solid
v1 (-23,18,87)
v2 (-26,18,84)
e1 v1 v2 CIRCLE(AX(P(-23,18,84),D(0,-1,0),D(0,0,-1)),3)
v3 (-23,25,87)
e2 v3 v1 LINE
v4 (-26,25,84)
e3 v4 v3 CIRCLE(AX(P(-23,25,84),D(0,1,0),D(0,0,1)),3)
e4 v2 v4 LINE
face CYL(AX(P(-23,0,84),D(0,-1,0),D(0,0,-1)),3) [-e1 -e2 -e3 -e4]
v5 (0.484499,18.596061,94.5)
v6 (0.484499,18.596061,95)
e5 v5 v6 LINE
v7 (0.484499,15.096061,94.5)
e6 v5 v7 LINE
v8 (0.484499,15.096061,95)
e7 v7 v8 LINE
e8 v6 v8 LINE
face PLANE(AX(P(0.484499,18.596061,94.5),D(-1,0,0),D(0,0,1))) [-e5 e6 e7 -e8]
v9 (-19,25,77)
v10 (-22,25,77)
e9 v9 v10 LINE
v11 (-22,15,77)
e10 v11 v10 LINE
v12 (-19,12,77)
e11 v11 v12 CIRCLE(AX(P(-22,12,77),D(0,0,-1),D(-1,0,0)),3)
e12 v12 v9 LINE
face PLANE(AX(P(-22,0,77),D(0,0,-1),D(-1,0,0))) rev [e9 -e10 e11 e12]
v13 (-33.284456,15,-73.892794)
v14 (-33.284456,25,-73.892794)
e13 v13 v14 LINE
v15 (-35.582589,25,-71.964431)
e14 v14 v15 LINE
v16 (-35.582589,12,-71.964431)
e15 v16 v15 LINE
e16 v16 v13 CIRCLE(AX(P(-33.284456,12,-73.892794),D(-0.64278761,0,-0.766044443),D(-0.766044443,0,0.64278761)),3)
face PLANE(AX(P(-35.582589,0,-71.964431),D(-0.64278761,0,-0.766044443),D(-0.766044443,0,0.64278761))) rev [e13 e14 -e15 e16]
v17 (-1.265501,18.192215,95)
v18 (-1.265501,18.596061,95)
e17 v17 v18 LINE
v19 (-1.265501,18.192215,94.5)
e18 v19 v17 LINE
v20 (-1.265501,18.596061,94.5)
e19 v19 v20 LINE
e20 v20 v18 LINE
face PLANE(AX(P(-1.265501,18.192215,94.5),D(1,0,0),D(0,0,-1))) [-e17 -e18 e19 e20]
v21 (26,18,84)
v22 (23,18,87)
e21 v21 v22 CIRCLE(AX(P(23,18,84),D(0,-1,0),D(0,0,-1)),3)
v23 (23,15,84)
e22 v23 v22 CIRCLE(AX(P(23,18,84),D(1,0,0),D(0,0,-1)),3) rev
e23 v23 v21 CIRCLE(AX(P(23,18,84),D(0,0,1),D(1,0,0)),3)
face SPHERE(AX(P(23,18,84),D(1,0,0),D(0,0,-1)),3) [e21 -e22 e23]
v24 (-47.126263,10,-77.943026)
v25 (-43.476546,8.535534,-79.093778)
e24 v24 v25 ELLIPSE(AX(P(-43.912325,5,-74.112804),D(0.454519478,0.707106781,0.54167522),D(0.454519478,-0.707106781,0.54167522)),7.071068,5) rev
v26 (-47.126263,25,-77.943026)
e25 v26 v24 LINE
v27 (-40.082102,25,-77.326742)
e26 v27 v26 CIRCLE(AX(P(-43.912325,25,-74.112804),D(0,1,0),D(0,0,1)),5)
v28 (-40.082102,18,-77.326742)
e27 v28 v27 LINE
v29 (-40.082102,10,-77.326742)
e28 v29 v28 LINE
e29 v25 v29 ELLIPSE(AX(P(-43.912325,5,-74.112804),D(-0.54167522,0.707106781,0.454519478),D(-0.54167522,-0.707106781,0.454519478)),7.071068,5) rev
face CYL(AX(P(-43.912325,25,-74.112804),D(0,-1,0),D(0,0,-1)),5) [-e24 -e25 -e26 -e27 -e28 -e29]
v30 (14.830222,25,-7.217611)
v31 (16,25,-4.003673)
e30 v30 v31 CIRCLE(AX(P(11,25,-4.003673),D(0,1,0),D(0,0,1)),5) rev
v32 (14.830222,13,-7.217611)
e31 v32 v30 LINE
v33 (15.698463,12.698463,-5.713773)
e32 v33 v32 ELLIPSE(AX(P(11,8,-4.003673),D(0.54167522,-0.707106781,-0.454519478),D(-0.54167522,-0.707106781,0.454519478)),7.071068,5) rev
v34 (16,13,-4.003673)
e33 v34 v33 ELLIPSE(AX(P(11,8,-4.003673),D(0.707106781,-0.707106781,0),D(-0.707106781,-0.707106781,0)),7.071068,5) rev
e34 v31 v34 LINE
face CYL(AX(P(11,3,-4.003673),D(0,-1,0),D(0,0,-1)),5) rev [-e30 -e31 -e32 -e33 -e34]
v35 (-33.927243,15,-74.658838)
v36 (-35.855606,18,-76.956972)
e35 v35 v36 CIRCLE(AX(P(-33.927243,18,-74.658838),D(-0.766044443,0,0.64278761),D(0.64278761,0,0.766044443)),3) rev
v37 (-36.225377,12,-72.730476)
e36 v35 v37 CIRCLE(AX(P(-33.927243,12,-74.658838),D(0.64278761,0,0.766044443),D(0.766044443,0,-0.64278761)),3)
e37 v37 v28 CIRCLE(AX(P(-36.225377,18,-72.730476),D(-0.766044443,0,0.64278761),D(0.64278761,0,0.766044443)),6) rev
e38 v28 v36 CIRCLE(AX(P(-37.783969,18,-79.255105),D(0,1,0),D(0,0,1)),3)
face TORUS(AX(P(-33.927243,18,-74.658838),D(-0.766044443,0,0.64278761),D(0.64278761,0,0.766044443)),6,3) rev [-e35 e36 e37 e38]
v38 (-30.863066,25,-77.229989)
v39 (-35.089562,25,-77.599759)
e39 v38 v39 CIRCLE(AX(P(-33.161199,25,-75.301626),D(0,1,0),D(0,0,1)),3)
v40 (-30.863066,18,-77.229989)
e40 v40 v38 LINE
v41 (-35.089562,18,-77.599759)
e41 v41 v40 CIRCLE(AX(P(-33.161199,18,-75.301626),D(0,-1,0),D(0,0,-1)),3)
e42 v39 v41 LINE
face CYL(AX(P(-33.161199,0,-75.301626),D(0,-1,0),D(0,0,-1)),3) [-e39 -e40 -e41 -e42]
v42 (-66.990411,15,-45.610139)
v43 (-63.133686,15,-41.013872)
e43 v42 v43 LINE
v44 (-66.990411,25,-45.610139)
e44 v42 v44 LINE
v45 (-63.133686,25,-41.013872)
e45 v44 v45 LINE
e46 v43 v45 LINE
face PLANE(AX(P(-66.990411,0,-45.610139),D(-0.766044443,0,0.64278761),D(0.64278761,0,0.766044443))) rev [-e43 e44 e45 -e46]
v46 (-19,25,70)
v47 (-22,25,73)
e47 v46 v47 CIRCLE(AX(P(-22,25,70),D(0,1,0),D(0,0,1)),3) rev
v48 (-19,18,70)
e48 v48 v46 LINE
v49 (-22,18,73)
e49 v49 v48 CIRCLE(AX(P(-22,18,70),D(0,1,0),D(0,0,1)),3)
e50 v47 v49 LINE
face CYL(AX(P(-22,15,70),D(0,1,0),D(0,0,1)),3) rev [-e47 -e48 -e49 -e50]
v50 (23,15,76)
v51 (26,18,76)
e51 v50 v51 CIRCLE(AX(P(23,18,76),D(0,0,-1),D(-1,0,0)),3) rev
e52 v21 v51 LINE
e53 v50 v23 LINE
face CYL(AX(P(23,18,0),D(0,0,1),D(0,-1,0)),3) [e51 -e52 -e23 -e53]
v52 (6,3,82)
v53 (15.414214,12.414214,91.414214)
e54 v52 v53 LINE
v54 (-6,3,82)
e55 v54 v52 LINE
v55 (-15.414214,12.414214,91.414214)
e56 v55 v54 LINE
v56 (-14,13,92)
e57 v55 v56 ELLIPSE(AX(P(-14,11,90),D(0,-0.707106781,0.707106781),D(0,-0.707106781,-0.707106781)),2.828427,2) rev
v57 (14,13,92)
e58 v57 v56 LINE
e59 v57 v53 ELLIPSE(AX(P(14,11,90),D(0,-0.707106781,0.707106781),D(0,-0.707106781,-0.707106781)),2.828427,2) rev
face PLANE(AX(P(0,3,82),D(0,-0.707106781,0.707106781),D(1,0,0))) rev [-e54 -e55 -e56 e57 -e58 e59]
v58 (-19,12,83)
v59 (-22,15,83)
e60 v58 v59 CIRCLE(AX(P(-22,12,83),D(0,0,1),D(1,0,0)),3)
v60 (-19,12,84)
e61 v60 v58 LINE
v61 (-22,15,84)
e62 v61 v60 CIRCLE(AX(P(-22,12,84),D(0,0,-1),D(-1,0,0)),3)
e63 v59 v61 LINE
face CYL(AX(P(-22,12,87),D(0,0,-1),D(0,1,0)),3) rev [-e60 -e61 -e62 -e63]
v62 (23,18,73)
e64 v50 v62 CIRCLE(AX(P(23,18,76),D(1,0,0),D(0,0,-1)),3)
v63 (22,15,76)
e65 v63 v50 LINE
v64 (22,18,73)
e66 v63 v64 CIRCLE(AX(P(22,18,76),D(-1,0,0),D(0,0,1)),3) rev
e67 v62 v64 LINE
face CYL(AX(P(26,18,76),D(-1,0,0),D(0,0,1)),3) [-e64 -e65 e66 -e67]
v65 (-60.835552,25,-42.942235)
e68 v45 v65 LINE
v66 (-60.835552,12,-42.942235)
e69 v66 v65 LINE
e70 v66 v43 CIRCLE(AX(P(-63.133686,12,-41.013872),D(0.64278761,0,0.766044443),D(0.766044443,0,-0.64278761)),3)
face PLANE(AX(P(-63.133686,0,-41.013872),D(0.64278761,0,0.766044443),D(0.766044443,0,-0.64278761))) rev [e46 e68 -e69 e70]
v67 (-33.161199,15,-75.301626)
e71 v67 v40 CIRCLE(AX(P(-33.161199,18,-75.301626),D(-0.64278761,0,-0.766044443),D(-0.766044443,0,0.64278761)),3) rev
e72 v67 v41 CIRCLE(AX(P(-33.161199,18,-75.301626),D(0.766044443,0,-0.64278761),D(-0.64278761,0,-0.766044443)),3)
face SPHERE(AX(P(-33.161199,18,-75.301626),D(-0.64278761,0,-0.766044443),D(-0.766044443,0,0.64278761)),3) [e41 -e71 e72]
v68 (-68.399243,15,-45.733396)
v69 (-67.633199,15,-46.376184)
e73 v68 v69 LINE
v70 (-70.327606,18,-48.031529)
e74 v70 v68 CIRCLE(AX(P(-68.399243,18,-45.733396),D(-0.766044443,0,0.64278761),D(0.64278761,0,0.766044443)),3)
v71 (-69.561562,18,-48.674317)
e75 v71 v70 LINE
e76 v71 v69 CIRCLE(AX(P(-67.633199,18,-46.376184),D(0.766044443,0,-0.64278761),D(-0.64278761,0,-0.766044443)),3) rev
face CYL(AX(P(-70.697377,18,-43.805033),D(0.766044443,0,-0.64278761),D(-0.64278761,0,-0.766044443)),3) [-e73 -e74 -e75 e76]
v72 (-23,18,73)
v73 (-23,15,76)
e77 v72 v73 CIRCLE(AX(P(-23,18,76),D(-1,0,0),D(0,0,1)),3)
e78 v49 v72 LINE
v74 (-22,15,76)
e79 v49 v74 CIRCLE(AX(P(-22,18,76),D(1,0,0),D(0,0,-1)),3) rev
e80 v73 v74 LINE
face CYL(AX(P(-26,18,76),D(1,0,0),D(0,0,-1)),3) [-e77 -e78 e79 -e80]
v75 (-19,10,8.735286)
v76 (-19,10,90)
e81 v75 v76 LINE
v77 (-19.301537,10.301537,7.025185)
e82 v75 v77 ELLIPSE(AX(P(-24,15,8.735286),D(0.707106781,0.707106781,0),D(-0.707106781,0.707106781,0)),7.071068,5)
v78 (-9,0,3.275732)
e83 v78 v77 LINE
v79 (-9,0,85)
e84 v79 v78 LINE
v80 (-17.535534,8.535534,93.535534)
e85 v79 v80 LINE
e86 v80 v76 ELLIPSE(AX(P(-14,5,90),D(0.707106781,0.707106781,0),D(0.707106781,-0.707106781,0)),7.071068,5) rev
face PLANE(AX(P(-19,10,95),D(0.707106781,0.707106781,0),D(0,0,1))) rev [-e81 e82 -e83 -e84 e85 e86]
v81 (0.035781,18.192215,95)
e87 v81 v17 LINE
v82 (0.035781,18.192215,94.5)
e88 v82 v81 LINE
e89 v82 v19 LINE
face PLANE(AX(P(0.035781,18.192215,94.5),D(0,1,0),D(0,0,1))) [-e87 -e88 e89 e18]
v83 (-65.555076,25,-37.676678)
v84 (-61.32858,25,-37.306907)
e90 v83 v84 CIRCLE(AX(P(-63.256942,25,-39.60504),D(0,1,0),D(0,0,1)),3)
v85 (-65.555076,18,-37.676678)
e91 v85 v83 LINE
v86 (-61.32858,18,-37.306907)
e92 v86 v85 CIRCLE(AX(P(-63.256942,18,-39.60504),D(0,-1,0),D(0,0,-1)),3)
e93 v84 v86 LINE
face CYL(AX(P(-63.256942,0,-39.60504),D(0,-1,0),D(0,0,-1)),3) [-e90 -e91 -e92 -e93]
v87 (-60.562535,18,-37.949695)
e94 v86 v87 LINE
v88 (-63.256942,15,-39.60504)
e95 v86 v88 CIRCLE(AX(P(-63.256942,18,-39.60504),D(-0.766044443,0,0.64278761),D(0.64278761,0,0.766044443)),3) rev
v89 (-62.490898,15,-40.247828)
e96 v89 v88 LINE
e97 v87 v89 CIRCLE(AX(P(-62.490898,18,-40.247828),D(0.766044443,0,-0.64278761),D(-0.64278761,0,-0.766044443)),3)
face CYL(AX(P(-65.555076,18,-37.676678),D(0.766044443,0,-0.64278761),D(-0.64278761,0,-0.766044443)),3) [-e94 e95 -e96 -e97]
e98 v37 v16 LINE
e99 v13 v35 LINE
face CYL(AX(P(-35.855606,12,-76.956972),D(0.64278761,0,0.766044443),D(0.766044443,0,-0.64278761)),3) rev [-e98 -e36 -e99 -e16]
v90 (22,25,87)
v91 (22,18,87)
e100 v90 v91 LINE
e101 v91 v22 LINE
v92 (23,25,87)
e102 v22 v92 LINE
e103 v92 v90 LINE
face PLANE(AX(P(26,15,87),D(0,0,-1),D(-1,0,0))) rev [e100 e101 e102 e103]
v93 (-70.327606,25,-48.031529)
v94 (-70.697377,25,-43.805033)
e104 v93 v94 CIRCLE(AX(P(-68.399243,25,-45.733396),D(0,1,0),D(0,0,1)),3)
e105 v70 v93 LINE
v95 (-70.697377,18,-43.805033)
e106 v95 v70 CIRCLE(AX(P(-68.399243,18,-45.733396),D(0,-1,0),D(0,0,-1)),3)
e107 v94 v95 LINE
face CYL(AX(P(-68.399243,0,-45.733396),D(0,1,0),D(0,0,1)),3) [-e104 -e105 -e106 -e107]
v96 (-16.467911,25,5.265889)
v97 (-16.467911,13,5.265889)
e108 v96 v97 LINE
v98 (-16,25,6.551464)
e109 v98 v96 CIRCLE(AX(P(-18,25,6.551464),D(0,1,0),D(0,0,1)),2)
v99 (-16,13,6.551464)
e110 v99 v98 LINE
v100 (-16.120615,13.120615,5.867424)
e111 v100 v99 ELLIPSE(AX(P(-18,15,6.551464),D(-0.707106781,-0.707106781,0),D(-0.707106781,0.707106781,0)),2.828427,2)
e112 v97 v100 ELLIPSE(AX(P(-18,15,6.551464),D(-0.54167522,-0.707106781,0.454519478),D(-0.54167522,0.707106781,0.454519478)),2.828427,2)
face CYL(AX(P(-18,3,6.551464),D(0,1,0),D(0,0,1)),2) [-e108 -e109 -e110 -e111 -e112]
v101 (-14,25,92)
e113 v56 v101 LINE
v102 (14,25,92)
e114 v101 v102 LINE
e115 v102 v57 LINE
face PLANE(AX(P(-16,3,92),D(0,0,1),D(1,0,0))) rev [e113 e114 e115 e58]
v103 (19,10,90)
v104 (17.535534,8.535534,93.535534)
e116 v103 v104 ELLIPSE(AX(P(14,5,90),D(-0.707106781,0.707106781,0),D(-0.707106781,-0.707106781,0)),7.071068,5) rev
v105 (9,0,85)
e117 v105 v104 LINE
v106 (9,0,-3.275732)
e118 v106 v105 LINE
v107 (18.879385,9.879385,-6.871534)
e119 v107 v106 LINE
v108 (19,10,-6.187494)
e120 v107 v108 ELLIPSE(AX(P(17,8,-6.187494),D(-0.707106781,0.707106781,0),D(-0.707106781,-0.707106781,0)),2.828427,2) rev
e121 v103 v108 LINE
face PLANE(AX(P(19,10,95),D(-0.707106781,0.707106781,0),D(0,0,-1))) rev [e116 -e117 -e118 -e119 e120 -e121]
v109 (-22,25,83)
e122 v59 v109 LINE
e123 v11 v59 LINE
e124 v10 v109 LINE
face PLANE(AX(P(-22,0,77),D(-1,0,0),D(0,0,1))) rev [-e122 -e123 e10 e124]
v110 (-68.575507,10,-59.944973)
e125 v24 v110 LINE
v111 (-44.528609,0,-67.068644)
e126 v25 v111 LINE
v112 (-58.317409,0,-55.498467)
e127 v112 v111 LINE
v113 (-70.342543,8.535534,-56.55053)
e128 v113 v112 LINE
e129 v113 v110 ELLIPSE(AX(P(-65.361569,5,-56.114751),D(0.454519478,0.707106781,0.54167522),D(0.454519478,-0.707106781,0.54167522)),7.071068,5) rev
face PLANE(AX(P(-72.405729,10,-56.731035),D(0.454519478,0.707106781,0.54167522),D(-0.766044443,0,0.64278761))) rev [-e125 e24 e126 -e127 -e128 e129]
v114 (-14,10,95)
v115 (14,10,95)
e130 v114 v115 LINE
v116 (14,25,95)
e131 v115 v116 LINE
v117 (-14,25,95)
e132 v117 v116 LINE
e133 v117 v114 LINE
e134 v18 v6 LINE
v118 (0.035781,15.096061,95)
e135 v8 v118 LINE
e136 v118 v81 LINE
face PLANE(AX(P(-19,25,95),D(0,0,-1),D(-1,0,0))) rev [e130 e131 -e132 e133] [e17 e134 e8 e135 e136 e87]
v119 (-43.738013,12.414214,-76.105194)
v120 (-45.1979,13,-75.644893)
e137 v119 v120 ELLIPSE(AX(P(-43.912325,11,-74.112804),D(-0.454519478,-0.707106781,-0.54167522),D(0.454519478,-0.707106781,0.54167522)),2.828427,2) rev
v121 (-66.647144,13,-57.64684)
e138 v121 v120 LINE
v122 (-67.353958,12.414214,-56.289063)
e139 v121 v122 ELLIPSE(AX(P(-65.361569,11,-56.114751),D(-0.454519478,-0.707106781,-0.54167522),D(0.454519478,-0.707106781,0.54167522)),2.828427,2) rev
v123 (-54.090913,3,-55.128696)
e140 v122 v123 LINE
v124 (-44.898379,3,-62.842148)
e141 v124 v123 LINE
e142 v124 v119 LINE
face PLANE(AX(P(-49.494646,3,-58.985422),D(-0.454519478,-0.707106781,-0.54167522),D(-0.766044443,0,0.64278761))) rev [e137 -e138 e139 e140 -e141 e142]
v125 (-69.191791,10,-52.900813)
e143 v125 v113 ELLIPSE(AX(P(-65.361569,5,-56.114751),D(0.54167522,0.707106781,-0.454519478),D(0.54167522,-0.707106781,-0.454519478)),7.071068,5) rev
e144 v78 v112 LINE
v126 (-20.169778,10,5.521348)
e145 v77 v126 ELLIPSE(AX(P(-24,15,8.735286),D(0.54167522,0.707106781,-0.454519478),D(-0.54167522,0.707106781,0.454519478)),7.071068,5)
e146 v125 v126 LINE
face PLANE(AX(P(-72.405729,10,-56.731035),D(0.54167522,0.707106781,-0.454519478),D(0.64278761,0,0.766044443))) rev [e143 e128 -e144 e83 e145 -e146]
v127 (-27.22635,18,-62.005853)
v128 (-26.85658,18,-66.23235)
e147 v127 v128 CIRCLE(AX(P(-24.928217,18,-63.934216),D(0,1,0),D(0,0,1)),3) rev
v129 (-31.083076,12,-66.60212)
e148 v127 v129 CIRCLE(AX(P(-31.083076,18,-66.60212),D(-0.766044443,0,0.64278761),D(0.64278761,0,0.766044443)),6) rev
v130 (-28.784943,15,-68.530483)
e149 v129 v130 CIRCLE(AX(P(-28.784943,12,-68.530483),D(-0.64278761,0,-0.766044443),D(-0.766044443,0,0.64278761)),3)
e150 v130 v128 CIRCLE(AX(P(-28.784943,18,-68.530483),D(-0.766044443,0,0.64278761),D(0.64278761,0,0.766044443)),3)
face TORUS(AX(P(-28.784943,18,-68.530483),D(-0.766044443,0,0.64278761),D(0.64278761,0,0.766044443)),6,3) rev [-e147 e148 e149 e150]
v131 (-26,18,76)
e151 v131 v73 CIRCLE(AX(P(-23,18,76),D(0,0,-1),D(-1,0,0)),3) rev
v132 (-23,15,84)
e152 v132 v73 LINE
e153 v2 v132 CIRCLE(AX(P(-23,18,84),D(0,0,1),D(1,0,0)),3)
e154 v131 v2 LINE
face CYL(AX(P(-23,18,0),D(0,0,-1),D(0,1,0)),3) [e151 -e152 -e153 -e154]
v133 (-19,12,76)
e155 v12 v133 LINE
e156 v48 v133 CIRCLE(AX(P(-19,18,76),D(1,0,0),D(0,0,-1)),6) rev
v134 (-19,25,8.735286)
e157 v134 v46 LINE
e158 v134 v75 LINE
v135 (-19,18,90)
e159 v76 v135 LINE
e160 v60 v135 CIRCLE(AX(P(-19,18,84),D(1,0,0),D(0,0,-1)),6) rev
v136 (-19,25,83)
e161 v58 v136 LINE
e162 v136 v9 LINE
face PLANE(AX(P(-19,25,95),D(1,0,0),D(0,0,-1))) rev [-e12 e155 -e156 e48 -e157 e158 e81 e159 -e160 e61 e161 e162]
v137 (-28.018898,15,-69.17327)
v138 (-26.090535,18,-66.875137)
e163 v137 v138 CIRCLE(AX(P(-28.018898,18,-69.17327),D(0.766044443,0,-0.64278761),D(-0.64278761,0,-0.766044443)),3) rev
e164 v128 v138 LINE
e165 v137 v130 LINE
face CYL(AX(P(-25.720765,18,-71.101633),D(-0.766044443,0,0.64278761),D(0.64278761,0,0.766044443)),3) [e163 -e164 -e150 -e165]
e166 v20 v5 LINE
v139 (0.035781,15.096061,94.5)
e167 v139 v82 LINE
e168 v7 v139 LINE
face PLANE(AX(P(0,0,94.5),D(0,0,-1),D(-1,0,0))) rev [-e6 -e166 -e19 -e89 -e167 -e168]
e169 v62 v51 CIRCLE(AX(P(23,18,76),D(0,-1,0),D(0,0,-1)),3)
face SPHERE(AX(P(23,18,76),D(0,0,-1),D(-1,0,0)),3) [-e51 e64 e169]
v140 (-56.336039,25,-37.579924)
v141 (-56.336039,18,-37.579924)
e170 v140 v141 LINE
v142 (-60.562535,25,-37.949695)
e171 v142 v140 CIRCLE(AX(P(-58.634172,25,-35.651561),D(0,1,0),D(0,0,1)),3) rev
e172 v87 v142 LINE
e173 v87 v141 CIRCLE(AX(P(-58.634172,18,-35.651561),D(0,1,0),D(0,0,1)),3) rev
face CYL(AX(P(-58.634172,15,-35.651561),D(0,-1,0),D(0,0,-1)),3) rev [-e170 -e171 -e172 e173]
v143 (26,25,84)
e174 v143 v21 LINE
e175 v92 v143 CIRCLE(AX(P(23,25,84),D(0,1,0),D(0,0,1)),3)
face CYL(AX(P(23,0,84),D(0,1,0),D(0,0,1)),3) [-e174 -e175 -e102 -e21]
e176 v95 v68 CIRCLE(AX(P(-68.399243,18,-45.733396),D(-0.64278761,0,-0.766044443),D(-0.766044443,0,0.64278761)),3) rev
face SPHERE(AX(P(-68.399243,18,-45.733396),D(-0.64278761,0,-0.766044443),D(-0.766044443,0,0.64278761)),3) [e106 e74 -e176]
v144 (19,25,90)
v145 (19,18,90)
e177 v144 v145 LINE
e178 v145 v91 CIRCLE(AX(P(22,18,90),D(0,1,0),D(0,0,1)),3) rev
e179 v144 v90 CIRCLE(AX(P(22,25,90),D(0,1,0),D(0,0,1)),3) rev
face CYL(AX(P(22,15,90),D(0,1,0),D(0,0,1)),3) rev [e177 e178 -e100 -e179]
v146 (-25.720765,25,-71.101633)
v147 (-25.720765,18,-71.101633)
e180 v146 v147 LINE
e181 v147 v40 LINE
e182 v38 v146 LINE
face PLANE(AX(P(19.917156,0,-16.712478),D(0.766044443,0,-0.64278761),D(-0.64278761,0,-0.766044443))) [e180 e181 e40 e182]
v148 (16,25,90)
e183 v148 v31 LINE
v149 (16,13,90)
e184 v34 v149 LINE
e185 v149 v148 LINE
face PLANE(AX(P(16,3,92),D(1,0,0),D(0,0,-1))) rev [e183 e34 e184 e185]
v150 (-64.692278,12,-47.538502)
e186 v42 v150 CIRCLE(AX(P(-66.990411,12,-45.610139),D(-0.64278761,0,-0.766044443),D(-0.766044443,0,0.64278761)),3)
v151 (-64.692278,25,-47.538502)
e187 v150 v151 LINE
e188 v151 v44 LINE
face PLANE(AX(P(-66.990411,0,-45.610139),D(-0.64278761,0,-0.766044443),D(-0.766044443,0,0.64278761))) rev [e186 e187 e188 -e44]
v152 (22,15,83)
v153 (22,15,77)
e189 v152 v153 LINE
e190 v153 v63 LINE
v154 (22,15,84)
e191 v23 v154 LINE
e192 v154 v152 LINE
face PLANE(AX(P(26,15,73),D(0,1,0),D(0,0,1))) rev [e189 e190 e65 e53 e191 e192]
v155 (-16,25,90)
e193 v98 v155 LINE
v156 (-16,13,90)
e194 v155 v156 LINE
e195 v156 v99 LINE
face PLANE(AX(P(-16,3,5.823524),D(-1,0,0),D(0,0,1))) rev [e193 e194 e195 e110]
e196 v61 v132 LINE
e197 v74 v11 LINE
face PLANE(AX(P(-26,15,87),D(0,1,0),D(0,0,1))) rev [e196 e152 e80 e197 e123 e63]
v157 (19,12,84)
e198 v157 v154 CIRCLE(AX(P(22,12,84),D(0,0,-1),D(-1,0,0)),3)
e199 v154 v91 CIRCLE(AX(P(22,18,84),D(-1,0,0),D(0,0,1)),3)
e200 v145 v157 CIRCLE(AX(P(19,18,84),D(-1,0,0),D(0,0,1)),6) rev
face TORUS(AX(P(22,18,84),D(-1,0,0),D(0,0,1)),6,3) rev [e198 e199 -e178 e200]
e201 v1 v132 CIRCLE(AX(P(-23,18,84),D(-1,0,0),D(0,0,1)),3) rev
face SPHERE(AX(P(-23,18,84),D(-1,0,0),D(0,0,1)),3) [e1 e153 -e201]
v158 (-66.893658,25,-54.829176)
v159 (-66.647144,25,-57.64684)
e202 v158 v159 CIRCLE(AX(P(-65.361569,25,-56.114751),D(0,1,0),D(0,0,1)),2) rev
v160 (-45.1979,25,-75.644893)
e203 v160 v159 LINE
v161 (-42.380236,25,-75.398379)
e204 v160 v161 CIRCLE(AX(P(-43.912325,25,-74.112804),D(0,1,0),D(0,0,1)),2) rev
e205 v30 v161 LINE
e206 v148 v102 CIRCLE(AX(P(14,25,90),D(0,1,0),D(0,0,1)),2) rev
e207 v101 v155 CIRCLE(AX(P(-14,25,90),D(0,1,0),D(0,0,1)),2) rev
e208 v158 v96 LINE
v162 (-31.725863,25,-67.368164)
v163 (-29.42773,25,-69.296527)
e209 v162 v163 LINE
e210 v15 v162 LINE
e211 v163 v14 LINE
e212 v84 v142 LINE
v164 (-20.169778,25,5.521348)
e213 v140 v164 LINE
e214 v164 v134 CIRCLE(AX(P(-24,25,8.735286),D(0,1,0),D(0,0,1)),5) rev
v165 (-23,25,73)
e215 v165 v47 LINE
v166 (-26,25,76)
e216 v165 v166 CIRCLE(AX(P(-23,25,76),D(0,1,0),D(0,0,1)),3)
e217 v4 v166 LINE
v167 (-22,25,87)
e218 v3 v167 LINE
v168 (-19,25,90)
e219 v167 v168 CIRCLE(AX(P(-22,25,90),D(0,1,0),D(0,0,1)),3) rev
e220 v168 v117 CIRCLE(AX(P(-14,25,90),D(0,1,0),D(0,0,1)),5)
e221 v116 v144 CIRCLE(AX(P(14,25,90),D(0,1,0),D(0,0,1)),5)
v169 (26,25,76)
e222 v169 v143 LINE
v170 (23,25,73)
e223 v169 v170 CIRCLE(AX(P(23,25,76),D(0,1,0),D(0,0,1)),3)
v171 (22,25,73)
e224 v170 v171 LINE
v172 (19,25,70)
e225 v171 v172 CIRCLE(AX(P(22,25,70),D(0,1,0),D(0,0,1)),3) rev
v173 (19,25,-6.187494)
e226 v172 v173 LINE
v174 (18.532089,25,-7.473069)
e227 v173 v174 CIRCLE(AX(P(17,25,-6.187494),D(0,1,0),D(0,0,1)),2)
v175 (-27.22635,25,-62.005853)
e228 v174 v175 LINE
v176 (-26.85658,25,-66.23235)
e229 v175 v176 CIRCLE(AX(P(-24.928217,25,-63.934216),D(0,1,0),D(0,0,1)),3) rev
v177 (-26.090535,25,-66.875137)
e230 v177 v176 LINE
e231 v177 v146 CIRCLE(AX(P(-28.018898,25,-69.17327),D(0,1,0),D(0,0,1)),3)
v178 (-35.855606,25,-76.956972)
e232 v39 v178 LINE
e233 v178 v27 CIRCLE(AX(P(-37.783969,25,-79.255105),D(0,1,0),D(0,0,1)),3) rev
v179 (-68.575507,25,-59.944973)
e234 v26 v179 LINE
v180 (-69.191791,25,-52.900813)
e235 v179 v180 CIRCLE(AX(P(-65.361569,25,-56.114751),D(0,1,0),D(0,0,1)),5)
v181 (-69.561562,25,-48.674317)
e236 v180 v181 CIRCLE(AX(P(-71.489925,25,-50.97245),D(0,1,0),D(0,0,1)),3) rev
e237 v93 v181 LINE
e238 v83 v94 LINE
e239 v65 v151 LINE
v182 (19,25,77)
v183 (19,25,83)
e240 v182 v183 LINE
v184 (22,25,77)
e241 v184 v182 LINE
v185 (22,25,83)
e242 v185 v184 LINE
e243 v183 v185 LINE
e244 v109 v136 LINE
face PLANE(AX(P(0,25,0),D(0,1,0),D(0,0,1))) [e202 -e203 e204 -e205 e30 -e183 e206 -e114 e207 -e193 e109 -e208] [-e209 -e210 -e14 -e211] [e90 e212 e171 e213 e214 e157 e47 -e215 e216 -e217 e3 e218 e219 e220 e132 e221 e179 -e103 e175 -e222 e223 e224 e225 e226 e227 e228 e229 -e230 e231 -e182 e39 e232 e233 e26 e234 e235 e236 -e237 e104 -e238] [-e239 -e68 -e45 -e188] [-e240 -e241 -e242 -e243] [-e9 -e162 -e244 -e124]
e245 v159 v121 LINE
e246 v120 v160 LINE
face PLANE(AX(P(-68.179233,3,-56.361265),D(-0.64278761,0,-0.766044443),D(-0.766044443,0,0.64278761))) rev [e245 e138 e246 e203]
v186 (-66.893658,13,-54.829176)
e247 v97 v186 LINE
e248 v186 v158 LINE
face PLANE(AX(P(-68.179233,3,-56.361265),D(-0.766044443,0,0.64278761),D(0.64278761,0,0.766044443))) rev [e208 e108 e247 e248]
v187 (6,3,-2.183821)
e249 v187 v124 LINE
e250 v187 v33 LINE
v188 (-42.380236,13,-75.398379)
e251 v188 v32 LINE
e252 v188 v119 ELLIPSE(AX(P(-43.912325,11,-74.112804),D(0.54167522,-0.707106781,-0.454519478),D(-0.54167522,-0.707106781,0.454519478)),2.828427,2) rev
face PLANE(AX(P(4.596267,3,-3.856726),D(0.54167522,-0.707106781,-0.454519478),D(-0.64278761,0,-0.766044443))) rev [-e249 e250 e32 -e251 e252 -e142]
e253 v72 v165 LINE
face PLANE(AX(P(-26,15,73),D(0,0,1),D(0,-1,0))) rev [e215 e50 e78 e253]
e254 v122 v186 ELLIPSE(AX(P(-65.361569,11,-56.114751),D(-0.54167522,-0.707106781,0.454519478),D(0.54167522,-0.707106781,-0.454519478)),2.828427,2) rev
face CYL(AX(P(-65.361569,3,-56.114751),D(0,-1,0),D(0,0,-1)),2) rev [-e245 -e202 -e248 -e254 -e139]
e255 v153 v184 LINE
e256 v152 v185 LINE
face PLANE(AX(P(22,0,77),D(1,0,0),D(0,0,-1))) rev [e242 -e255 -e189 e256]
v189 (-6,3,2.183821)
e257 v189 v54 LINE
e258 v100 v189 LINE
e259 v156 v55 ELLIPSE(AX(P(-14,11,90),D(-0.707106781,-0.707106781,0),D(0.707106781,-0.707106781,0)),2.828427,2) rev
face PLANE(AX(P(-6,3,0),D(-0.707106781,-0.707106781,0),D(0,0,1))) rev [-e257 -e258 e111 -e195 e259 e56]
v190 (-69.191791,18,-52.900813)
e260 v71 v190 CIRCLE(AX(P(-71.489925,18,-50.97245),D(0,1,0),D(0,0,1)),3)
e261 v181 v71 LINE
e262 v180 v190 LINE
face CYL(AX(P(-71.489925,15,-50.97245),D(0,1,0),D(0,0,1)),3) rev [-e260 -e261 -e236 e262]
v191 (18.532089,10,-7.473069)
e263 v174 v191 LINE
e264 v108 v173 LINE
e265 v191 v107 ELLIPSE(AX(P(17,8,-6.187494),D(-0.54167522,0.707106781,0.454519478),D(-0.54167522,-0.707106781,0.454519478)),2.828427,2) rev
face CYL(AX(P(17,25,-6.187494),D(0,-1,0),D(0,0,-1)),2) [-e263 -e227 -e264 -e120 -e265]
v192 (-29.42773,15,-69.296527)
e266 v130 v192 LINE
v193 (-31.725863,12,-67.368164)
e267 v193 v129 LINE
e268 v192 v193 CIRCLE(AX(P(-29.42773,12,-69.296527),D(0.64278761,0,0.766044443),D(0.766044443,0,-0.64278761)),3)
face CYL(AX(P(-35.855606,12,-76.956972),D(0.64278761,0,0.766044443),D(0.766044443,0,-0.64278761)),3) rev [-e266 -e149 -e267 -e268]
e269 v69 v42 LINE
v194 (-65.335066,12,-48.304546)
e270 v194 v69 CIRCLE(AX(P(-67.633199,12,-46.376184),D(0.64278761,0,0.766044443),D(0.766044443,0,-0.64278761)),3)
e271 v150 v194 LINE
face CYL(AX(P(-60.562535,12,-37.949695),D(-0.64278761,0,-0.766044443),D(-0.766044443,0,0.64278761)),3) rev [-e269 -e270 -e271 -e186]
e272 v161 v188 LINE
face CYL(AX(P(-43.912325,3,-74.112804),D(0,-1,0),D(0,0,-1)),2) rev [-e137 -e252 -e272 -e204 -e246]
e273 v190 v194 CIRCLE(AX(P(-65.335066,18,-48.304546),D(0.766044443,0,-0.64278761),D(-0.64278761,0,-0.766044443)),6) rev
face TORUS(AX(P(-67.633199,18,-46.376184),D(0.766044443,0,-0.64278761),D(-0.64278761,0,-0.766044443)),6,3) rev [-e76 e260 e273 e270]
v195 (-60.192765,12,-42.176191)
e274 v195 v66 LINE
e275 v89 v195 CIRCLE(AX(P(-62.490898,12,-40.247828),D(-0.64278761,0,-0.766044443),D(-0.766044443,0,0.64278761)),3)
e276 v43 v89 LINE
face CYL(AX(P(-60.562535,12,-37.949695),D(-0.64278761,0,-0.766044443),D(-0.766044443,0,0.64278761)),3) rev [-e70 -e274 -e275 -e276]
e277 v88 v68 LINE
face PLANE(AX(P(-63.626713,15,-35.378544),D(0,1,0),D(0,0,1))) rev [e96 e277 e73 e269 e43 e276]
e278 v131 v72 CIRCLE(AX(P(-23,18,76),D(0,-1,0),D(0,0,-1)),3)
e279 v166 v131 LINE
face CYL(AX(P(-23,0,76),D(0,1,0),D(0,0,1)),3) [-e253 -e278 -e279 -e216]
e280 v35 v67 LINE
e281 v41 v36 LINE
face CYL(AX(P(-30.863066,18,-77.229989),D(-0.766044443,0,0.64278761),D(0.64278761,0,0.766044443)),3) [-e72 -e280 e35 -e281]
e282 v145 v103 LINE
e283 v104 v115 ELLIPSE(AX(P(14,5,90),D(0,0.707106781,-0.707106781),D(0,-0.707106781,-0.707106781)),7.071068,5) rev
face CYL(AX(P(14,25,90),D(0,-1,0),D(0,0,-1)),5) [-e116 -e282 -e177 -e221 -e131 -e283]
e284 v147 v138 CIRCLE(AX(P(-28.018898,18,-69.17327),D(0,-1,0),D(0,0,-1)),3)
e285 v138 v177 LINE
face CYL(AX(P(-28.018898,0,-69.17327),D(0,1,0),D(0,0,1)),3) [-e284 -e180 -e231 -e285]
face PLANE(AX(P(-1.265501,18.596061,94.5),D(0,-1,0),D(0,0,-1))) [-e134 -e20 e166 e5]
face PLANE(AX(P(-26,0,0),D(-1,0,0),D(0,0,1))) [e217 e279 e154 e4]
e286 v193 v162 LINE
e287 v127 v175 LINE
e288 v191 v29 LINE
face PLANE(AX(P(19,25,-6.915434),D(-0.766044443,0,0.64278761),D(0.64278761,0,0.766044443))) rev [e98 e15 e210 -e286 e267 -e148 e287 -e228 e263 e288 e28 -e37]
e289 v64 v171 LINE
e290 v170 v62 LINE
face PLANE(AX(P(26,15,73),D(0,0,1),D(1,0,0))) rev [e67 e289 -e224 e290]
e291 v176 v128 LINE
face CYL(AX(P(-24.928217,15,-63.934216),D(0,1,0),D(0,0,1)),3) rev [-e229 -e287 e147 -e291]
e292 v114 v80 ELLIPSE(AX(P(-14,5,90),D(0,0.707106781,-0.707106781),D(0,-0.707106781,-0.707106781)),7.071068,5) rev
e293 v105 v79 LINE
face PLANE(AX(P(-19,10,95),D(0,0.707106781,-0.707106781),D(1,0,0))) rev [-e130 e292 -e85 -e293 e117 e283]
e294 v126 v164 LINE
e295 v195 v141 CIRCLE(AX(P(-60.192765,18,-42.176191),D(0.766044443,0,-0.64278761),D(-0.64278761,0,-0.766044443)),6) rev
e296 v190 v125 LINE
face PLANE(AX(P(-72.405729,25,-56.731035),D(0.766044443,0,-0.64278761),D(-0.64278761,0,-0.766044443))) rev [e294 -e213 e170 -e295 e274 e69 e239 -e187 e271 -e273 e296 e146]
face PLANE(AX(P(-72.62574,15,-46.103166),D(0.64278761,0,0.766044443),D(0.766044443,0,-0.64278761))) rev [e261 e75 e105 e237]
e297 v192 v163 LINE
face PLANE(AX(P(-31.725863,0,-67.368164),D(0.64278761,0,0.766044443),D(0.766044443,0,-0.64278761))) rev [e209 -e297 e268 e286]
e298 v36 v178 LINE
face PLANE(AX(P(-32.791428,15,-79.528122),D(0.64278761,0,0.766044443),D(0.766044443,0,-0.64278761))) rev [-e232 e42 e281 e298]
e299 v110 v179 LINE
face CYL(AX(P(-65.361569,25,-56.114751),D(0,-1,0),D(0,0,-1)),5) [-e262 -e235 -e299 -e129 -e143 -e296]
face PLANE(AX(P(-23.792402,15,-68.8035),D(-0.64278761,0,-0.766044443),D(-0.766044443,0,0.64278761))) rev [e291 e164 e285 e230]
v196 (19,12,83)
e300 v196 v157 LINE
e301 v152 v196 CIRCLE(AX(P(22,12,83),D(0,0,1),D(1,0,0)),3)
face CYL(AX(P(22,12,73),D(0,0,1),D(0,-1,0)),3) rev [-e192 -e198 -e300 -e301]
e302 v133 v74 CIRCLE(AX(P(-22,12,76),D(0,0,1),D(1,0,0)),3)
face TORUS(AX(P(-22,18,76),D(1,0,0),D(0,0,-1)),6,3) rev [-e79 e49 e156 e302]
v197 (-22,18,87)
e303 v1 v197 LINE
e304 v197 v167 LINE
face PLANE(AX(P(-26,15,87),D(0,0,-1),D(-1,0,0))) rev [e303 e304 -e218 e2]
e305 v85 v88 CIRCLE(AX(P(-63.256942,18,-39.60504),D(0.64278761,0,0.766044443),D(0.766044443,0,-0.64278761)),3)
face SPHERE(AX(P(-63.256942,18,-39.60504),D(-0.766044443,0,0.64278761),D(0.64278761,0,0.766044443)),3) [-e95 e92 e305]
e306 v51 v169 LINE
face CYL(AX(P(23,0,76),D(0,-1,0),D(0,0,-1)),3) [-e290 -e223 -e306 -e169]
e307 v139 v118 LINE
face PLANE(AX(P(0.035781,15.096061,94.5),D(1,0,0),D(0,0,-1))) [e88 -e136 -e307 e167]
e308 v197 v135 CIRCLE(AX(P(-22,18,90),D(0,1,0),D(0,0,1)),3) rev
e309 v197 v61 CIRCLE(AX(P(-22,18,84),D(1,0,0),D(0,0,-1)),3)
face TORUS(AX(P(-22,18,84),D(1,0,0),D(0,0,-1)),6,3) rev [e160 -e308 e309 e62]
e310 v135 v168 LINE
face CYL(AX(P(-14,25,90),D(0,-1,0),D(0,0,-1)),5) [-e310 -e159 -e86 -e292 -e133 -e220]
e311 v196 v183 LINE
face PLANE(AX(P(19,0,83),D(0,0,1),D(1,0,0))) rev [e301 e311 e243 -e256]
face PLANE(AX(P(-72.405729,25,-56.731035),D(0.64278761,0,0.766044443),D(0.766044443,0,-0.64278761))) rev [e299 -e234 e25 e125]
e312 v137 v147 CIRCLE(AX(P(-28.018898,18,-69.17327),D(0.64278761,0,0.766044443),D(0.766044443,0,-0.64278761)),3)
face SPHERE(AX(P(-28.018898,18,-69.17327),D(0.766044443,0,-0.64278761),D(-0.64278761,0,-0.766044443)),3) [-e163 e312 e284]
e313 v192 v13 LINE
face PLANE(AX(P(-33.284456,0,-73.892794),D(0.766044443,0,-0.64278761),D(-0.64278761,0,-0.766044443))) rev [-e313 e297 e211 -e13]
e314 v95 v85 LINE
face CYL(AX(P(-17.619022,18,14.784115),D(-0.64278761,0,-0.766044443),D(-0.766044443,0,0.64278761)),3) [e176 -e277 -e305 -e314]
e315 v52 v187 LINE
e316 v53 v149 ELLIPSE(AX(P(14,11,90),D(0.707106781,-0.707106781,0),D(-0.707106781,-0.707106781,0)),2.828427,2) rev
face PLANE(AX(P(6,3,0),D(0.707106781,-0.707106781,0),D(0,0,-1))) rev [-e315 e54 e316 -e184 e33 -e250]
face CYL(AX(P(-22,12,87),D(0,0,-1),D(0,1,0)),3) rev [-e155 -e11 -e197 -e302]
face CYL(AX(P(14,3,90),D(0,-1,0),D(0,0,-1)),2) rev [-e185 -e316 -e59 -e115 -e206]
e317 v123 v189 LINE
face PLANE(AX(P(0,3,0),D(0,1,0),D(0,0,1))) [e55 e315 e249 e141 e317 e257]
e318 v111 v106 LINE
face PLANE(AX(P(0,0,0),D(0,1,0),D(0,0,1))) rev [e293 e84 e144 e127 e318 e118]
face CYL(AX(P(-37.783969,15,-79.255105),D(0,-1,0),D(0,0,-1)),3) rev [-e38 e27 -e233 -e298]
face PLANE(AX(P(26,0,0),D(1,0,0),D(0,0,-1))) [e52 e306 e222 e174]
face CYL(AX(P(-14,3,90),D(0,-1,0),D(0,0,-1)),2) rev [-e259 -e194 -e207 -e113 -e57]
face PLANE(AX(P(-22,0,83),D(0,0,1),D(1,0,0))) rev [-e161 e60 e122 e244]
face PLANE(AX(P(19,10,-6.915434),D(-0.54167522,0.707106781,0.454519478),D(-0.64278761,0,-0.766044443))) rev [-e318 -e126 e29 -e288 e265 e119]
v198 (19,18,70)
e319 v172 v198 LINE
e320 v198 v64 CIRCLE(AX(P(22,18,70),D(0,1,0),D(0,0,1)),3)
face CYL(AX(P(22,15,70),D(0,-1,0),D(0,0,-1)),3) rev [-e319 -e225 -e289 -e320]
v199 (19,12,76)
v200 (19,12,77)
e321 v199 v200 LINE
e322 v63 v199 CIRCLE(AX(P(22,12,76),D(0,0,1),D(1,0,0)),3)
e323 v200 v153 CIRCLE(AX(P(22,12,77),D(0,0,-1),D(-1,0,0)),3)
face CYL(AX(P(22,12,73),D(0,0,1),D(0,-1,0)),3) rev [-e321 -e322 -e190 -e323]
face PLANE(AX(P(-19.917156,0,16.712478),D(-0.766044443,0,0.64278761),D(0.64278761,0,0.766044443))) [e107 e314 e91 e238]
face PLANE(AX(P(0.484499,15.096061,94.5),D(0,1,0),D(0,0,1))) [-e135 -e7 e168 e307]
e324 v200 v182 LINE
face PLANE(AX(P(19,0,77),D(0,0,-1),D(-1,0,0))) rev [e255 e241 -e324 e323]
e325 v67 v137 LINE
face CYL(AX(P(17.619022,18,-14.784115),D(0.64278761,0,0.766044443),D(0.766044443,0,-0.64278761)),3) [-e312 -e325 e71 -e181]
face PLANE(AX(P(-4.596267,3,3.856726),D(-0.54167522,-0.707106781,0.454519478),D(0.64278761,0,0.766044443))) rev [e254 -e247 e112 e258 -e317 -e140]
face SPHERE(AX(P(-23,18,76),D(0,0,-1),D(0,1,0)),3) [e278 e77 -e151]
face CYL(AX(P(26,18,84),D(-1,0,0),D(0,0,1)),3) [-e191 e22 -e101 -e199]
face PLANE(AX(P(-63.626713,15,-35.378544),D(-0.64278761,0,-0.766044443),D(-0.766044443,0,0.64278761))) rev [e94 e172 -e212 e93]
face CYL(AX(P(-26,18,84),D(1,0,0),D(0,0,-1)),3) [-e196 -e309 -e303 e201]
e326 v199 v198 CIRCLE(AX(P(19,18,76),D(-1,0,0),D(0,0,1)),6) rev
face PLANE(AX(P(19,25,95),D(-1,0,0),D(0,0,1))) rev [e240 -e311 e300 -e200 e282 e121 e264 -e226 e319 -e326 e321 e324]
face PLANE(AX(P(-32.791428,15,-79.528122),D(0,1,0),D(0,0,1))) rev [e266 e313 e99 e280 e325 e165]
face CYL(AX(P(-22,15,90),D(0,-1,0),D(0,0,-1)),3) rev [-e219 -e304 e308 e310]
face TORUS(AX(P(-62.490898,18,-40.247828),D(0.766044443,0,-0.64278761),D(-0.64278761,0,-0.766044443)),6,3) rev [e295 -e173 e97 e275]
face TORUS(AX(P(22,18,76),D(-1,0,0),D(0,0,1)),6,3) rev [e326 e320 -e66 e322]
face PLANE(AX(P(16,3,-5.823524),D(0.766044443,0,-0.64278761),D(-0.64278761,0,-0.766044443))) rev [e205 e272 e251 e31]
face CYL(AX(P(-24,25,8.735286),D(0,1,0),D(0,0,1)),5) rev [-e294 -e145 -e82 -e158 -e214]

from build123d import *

# Parameters (mm, degrees)
BOSS_EXTRUDE1_DEPTH = 25
CUT_EXTRUDE1_DEPTH  = 22
CHAMFER1_SIZE       = 10
FILLET1_R           = 2
FILLET2_R           = 5
CUT_EXTRUDE4_DEPTH  = 0.5
BOSS_EXTRUDE2_DEPTH = 7
BOSS_EXTRUDE3_DEPTH = 7
BOSS_EXTRUDE4_DEPTH = 7
BOSS_EXTRUDE5_DEPTH = 7
SKETCH10_W          = 3
SKETCH10_H          = 6
CUT_EXTRUDE5_DEPTH  = 123.16586282655703
FILLET3_R           = 3


with BuildPart() as part:
    # Sketch1 → Boss-Extrude1 (new body)
    with BuildSketch(Plane(origin=(0, 0, 0), x_dir=(1, 0, 0), z_dir=(0, 1, 0))):
        Polygon((19, -95), (19, 6.9154344510577115), (-43.296040452526896, 81.15696446475283), (-72.40572929104839, 56.73103529666472), (-18.999999999999996, -6.915434451057793), (-19, -95), align=None)
    extrude(amount=BOSS_EXTRUDE1_DEPTH)

    # Sketch2 → Cut-Extrude1 (cut)
    with BuildSketch(Plane(origin=(0, 25, 0), x_dir=(1, 0, 0), z_dir=(0, 1, 0))):
        Polygon((-68.17923313263185, 56.36126479636737), (-43.66581095282428, 76.93046830633632), (16, 5.823523748259106), (16.00000000000001, -92), (-15.99999999999999, -92), (-15.999999999999996, -5.823523748259207), align=None)
    extrude(amount=-CUT_EXTRUDE1_DEPTH, mode=Mode.SUBTRACT)

    # Chamfer1
    chamfer1_edges = [part.edges().sort_by_distance(p)[0] for p in [
        (-42.089616566315925, 3, -25.26887052405408),
        (-55.92252204272806, 3, -66.64586655135184),
        (-13.83290547641214, 3, -41.376996027297714),
        (16.000000000000007, 3, 43.08823812587045),
        (1.066e-14, 3, 92),
        (-15.999999999999993, 3, 48.9117618741296),
        (-18.999999999999996, 0, 50.957717225528896),
        (-45.7028646455242, 0, -24.90780042280347),
        (-57.85088487178764, 0, -68.94399988070877),
        (-12.148020226263444, 0, -44.036199457905276),
        (19, 0, 44.04228277447115),
        (0, 0, 95),
    ]]
    chamfer(chamfer1_edges, length=CHAMFER1_SIZE)

    # Fillet1
    fillet1_edges = [part.edges().sort_by_distance(p)[0] for p in [
        (19, 17.5, -6.9154344510577115),
        (-68.17923313263185, 19, -56.36126479636737),
        (-43.66581095282428, 19, -76.93046830633632),
        (16.00000000000001, 19, 92),
        (-15.99999999999999, 19, 92),
        (-15.999999999999996, 19, 5.823523748259207),
    ]]
    fillet(fillet1_edges, radius=FILLET1_R)

    # Fillet2
    fillet2_edges = [part.edges().sort_by_distance(p)[0] for p in [
        (-19, 17.5, 95),
        (-18.999999999999996, 17.5, 6.915434451057793),
        (-72.40572929104839, 17.5, -56.73103529666472),
        (-43.296040452526896, 17.5, -81.15696446475283),
        (19, 17.5, 95),
        (16, 19, -5.823523748259106),
    ]]
    fillet(fillet2_edges, radius=FILLET2_R)

    # Sketch9 → Cut-Extrude4 (cut)
    with BuildSketch(Plane.XY.offset(95)):
        Polygon((0.4844994416495535, 15.096060671986343), (0.03578149293160474, 15.096060671986343), (0.03578149293160474, 18.19221451814019), (-1.2655005583504468, 18.19221451814019), (-1.2655005583504468, 18.596060671986343), (0.4844994416495535, 18.596060671986343), align=None)
    extrude(amount=-CUT_EXTRUDE4_DEPTH, mode=Mode.SUBTRACT)

    # Sketch3 → Boss-Extrude2 (add)
    with BuildSketch(Plane(origin=(-14.554844419260807, 0, 12.212964584044096), x_dir=(0.6427876096865288, 0, 0.766044443118987), z_dir=(-0.766044443118987, 0, 0.6427876096865288))):
        Polygon((-68, 15.000000000000004), (-82.00000000000001, 15.000000000000002), (-82.00000000000001, 25), (-68.00000000000001, 25), align=None)
    extrude(amount=BOSS_EXTRUDE2_DEPTH)

    # Sketch4 → Boss-Extrude3 (add)
    with BuildSketch(Plane(origin=(14.554844419260744, 0, -12.212964584044062), x_dir=(-0.6427876096865294, 0, -0.7660444431189866), z_dir=(0.7660444431189866, 0, -0.6427876096865294))):
        Polygon((82.00000000000001, 15.000000000000002), (68.00000000000001, 14.999999999999998), (68.00000000000001, 25), (82.00000000000001, 25), align=None)
    extrude(amount=BOSS_EXTRUDE3_DEPTH)

    # Sketch6 → Boss-Extrude4 (add)
    with BuildSketch(Plane.ZY.offset(18.999999999999996)):
        Polygon((87, 15.000000000000002), (73, 15), (72.99999999999999, 25), (87, 25), align=None)
    extrude(amount=BOSS_EXTRUDE4_DEPTH)

    # Sketch7 → Boss-Extrude5 (add)
    with BuildSketch(Plane(origin=(19, 0, 0), x_dir=(0, 0, -1), z_dir=(1, 0, 0))):
        Polygon((-73, 15.000000000000004), (-87, 15.000000000000002), (-87, 25), (-73, 25), align=None)
    extrude(amount=BOSS_EXTRUDE5_DEPTH)

    # Sketch10 → Cut-Extrude5 (cut, through all)
    with BuildSketch(Plane(origin=(0, 25, 0), x_dir=(1, 0, 0), z_dir=(0, 1, 0))):
        Polygon((-66.99041130416701, 45.61013915017732), (-64.69227797481005, 47.53850197923691), (-60.83555231669091, 42.942235320523), (-63.13368564604784, 41.013872491463395), align=None)
        Polygon((-35.582589136288576, 71.96443114732502), (-33.28445580693161, 73.8927939763846), (-29.427730148812422, 69.29652731767068), (-31.725863478169394, 67.3681644886111), align=None)
        with Locations((-20.499999999999996, -79.99999999999999)):
            Rectangle(SKETCH10_W, SKETCH10_H)
        with Locations((20.5, -80)):
            Rectangle(SKETCH10_W, SKETCH10_H)
    extrude(amount=-CUT_EXTRUDE5_DEPTH, mode=Mode.SUBTRACT)

    # Fillet3
    fillet3_edges = [part.edges().sort_by_distance(p)[0] for p in [
        (-58.26440187794476, 20, -39.878057548047025),
        (-65.97785319418313, 15.000000000000002, -49.07059086547488),
        (19, 20, 87),
        (19, 15.000000000000004, 75),
        (-18.999999999999996, 20, 87),
        (-18.999999999999996, 20, 73),
        (-29.154713039423243, 20, -64.30398671613516),
        (-38.153739575034656, 20, -75.02860891980096),
        (-60.94555742886122, 15.000000000000004, -37.62830091414418),
        (-59.549977097317836, 15.000000000000004, -41.410146434285004),
        (-63.62671297977768, 20, -35.37854428024132),
        (-67.26342841355618, 20, -50.60267975171285),
        (-72.62573951538909, 20, -46.103166483907145),
        (-68.12622624758338, 15.000000000000004, -40.74085538207423),
        (-69.94458396447264, 15.000000000000002, -48.35292311781),
        (26, 20, 87),
        (22.5, 15.000000000000002, 87),
        (19, 15.000000000000002, 85),
        (26, 15.000000000000004, 80),
        (19, 20, 73),
        (22.5, 15.000000000000004, 73),
        (26, 20, 73),
        (-25.999999999999996, 20, 87),
        (-22.499999999999996, 15.000000000000002, 87),
        (-18.999999999999996, 15.000000000000002, 85),
        (-18.999999999999996, 15, 75),
        (-25.999999999999996, 15, 80),
        (-25.999999999999996, 20, 73),
        (-22.499999999999996, 15, 73),
        (-30.440288258796315, 14.999999999999998, -65.83607560237314),
        (-26.47355748850679, 14.999999999999998, -66.553743350038),
        (-23.792401937590338, 20, -68.80349998394087),
        (-35.472584024118206, 15.000000000000002, -77.27836555370381),
        (-28.29191520539604, 15, -74.16581108577375),
        (-36.868164355661605, 15.000000000000002, -73.496520033563),
        (-32.79142847320175, 20, -79.52812218760667),
    ]]
    fillet(fillet3_edges, radius=FILLET3_R - 0.0001)  # a hair under: the kernel refuses the full size


solid = part.part
